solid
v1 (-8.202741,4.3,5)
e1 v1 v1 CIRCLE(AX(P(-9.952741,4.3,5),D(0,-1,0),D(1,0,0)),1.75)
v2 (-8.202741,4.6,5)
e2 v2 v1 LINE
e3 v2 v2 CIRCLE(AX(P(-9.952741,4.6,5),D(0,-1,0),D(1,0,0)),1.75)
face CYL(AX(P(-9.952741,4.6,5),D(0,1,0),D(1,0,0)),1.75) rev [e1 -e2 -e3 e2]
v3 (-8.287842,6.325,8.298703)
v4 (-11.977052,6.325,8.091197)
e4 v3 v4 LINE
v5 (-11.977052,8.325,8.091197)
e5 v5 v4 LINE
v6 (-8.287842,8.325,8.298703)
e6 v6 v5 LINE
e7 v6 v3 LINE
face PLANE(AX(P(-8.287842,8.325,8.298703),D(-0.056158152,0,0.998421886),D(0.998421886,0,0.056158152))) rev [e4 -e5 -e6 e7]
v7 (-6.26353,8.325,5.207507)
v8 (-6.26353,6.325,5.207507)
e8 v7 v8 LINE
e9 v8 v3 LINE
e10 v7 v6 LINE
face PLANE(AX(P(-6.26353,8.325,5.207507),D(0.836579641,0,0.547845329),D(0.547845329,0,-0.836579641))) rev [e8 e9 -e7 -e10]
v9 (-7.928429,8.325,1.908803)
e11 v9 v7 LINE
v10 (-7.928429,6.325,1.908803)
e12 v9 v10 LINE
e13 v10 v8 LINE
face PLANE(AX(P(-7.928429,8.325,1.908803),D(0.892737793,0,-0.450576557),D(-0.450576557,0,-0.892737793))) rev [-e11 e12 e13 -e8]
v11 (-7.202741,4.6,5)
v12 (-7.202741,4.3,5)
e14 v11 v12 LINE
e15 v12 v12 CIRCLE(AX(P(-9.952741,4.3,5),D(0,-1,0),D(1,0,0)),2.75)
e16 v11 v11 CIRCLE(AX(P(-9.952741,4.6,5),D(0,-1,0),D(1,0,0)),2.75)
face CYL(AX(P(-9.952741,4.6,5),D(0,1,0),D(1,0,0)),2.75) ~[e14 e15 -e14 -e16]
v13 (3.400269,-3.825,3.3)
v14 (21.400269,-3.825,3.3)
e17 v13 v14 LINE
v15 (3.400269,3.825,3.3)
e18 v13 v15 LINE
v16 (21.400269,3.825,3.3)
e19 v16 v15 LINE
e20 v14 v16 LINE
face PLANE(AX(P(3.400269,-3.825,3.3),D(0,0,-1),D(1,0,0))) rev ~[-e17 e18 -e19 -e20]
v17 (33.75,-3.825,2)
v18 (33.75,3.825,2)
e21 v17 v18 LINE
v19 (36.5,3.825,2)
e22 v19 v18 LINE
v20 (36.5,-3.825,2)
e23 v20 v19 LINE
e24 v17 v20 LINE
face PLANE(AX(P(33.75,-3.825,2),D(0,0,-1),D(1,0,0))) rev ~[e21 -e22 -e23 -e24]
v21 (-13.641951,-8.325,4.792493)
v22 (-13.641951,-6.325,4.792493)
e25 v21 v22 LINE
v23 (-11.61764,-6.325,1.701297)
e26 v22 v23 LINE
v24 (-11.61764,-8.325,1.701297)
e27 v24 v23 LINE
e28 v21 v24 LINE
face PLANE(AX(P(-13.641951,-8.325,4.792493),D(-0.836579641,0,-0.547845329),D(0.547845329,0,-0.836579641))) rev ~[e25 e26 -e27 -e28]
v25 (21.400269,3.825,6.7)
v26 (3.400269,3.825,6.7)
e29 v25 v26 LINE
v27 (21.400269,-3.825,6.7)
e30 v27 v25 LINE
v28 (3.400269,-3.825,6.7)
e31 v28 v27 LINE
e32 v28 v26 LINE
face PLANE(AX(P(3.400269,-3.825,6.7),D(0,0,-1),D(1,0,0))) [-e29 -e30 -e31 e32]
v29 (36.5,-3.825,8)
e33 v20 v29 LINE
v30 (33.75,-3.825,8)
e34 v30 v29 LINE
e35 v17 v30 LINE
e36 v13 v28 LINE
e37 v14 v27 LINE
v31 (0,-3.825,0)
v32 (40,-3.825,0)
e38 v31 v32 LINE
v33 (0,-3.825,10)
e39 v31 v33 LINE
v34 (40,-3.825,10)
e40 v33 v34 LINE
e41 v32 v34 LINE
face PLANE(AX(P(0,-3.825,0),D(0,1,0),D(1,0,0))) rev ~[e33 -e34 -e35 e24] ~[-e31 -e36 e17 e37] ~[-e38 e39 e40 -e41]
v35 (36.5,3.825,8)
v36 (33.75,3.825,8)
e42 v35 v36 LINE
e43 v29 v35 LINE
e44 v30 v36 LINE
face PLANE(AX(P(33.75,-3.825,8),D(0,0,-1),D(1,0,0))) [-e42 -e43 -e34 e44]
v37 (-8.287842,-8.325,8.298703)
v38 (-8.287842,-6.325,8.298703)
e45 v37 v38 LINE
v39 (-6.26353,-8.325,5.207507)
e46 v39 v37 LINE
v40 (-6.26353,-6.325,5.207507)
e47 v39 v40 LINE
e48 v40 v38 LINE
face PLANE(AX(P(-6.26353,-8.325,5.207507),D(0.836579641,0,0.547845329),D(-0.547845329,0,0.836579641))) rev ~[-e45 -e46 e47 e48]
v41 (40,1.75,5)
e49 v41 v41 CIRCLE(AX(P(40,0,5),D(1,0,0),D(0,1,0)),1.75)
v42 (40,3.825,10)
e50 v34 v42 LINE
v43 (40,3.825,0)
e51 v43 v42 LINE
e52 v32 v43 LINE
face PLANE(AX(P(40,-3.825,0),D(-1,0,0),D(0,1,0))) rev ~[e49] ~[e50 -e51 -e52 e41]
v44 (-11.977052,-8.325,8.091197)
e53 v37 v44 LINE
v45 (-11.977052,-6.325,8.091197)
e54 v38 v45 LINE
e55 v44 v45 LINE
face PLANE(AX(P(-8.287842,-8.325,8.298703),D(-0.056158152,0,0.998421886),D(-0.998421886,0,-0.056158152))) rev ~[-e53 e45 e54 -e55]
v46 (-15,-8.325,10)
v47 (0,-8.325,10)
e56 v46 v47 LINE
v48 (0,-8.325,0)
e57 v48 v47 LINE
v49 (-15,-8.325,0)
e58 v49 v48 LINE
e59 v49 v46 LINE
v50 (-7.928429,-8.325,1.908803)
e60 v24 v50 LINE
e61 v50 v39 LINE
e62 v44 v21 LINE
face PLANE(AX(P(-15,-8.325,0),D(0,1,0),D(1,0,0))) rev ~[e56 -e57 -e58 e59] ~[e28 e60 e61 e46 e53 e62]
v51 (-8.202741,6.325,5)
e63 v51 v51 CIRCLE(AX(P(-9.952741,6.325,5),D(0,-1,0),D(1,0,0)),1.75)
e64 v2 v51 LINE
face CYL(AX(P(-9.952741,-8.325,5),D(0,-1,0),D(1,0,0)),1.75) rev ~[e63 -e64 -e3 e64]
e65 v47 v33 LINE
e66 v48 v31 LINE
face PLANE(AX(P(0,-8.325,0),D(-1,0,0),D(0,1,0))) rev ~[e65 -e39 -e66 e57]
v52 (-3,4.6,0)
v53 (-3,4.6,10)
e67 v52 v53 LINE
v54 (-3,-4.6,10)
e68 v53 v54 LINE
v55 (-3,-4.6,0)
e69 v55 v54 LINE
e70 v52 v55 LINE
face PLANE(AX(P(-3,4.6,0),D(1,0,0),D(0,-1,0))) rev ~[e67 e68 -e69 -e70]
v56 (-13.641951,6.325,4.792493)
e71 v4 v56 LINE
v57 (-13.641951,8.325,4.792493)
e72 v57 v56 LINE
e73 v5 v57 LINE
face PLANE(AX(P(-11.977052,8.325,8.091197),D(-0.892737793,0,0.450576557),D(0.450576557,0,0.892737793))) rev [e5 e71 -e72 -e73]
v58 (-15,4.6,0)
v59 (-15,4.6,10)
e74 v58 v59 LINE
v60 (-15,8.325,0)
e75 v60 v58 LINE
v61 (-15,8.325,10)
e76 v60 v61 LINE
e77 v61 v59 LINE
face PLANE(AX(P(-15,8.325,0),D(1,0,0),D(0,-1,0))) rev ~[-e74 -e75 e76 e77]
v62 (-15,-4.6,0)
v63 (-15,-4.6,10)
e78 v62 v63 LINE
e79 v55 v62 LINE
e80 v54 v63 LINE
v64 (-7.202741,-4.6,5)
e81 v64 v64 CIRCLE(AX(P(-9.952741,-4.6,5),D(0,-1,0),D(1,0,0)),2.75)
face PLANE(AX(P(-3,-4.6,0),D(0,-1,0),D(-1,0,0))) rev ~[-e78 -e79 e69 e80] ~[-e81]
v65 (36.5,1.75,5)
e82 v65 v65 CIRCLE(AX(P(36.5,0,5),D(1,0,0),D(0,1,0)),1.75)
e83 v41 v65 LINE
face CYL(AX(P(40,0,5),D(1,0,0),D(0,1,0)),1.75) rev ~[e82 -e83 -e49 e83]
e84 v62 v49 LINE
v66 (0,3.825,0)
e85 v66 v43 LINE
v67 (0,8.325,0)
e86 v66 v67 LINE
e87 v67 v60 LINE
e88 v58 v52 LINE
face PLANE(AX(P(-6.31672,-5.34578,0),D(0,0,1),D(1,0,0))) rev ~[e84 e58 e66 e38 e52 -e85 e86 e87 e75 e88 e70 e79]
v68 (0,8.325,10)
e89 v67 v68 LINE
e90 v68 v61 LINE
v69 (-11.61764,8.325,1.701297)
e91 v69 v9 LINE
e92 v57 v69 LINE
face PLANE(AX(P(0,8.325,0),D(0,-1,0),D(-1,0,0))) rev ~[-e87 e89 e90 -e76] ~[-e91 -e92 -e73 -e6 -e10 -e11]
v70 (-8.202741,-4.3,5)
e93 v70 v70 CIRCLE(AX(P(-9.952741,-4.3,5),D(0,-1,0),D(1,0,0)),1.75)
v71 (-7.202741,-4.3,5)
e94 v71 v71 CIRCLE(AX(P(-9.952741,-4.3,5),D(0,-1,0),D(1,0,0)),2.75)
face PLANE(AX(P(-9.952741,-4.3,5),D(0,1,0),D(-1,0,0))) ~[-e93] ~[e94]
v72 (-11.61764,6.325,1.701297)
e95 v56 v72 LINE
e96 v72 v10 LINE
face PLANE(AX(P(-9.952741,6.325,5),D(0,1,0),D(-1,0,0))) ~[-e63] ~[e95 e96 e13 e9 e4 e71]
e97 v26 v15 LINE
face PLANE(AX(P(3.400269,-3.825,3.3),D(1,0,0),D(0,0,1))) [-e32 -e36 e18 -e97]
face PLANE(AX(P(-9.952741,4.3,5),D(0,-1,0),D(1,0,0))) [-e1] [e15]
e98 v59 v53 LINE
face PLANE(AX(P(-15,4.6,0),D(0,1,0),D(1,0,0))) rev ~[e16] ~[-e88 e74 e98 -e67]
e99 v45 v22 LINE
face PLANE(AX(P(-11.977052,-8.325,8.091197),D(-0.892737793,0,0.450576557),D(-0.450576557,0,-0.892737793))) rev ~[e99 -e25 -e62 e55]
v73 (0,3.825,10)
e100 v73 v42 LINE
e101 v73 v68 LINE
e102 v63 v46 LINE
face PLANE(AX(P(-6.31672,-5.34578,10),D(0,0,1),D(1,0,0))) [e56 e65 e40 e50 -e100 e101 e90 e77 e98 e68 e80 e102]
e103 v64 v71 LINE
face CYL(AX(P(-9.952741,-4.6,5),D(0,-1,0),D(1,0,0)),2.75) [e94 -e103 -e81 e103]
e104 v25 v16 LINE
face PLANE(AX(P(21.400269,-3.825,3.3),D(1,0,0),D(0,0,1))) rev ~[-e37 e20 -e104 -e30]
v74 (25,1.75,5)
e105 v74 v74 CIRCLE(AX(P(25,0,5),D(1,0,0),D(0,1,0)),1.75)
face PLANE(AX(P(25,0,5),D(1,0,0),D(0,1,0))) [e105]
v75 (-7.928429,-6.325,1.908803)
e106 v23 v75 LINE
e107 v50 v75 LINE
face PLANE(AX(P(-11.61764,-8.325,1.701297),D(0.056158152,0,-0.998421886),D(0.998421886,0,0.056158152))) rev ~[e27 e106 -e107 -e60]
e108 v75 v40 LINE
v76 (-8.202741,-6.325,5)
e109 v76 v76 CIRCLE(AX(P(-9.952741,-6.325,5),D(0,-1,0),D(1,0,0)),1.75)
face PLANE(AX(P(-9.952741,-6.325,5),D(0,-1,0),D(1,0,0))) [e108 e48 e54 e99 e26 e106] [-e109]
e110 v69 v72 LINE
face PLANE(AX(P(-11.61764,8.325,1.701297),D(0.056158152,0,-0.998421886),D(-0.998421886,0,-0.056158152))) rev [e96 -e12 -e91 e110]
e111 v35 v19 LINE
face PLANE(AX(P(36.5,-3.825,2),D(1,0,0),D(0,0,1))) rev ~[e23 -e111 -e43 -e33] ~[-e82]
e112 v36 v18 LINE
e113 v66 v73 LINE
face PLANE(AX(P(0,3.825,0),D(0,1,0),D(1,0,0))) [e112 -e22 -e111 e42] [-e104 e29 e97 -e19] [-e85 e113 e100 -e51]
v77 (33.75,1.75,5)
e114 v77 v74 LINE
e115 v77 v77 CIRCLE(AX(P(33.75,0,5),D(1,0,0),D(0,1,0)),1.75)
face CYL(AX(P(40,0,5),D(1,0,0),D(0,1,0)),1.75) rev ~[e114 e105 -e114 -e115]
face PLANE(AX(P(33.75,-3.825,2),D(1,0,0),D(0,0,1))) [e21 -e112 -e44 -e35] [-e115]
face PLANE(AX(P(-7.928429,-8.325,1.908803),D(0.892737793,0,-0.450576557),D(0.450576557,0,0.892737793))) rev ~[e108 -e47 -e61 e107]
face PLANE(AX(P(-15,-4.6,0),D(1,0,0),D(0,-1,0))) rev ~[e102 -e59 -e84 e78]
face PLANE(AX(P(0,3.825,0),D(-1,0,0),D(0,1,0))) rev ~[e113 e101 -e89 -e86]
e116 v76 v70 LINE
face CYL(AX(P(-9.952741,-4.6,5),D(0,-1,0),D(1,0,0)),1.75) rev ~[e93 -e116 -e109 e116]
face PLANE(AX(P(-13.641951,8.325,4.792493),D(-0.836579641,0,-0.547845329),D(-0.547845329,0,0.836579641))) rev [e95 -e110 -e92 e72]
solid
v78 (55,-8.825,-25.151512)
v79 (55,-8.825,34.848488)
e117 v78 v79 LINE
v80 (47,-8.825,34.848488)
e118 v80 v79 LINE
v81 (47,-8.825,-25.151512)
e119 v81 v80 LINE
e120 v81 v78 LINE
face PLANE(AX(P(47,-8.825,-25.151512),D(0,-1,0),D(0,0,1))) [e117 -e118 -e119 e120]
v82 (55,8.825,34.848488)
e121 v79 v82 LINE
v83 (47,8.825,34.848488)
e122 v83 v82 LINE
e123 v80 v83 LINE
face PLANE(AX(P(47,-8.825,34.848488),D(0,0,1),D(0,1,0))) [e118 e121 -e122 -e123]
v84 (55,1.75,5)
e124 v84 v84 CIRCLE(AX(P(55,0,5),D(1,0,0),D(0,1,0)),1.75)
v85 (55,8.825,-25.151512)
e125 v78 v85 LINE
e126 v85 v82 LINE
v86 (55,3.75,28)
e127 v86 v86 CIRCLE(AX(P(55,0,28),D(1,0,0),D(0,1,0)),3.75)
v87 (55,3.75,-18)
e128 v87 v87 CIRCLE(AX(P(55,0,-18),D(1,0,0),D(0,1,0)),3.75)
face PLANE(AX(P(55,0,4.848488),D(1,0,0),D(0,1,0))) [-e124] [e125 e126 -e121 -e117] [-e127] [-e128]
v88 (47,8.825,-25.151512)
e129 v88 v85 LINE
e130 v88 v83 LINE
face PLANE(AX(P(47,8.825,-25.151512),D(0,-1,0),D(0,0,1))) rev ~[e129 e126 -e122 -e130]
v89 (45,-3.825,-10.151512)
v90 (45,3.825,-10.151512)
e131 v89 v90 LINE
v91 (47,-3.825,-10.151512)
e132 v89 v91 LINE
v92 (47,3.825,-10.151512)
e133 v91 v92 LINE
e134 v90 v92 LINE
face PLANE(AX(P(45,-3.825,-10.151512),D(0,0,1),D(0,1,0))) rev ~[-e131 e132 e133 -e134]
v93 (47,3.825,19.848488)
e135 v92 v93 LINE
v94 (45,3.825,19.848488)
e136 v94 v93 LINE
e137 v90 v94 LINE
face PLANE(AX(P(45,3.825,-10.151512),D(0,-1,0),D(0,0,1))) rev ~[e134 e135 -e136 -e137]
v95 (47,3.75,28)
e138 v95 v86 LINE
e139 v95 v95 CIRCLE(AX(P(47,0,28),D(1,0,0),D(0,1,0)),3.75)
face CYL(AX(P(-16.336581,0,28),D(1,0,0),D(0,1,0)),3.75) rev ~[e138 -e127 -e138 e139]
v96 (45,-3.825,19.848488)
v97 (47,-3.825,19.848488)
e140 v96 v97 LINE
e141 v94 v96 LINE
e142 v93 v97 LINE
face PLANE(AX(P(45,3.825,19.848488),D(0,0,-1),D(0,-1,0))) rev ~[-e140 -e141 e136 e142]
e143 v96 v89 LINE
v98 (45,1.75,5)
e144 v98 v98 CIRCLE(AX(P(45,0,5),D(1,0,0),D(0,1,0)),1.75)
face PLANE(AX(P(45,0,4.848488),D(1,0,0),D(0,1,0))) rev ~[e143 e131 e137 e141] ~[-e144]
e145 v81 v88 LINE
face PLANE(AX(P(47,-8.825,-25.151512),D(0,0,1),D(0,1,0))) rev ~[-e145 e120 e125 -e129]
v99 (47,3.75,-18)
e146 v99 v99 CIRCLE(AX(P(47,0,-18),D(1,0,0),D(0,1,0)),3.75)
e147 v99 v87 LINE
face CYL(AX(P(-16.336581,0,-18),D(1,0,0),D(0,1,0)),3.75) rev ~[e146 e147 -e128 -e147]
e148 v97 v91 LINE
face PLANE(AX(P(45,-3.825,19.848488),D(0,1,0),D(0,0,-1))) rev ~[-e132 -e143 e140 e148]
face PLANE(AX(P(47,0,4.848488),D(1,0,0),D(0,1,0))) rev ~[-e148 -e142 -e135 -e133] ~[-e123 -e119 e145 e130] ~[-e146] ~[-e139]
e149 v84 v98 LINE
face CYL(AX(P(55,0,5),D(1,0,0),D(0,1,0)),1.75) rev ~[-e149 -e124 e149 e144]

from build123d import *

# Parameters (mm, degrees)
F0_W      = 40
F0_H      = 3.825
F1_DEPTH  = 10
F2_R      = 1.75
F3_DEPTH  = 16.651
F4_W      = 18
F4_H      = 3.4
F4_W_2    = 2.75
F4_H_2    = 6
F5_DEPTH  = 12.151
F6_R      = 1.75
F7_DEPTH  = 15
F10_DEPTH = 2
F11_W     = 17.65
F11_H     = 60
F12_DEPTH = 8
F13_R     = 1.75
F14_DEPTH = 70.001
F15_R     = 2.75
F15_R_2   = 1.75
F16_DEPTH = 0.3
F17_R     = 1.75
F18_DEPTH = 2
F20_D     = 7.5


# Not quite as in the source:
# - a pattern or mirror of a feature is missing from the dataset's text; its kind, count and spacing are read off the source's solid


with BuildPart() as f1:
    # F0 (on Top) → F1 (new body)
    with BuildSketch(Plane.XY):
        Polygon((0, -3.825), (0, 0), (-3, 0), (-3, -4.6), (-15, -4.6), (-15, -8.325), (0, -8.325), align=None)
        Polygon((-3, 0), (0, 0), (0, 3.825), (0, 8.325), (-15, 8.325), (-15, 4.6), (-3, 4.6), align=None)
        with Locations((20, 1.9125)):
            Rectangle(F0_W, F0_H)
        with Locations((20, -1.9125)):
            Rectangle(F0_W, F0_H)
    extrude(amount=F1_DEPTH)

    # F2 (on face) → F3 (cut, through all)
    with BuildSketch(Plane.XZ.offset(8.325)):
        with Locations((-9.9527407438, 5)):
            Circle(F2_R)
    extrude(amount=-F3_DEPTH, mode=Mode.SUBTRACT)

    # F4 (on face) → F5 (cut, through all)
    with BuildSketch(Plane.XZ.offset(3.825)):
        with Locations((12.4002694301, 5)):
            Rectangle(F4_W, F4_H)
        with Locations((35.125, 5)):
            Rectangle(F4_W_2, F4_H_2)
    extrude(amount=-F5_DEPTH, mode=Mode.SUBTRACT)

    # F6 (on face) → F7 (cut)
    with BuildSketch(Plane.YZ.offset(40)):
        with Locations((0, 5)):
            Circle(F6_R)
    extrude(amount=-F7_DEPTH, mode=Mode.SUBTRACT)

    # F15 (on face) → F16 (join)
    with BuildSketch(Plane.XZ.offset(-4.6)):
        with Locations((-9.9527407438, 5)):
            Circle(F15_R)
        with Locations((-9.9527407438, 5)):
            Circle(F15_R_2, mode=Mode.SUBTRACT)
    f16 = extrude(amount=F16_DEPTH)

    # F16_copies: F16 across plane
    add(f16.mirror(Plane(origin=(0, 0, 0), x_dir=(0, 0, -1), z_dir=(0, -1, 0))))

    # F17 (on face) → F18 (cut)
    with BuildSketch(Plane.XZ.offset(8.325)):
        Polygon((-7.9284293953, 1.9088033227), (-6.2635302189, 5.2075067143), (-8.2878415673, 8.2987033916), (-11.9770520922, 8.0911966773), (-13.6419512686, 4.7924932857), (-11.6176399202, 1.7012966084), align=None)
        with Locations((-9.9527407438, 5)):
            Circle(F17_R, mode=Mode.SUBTRACT)
    f18 = extrude(amount=-F18_DEPTH, mode=Mode.SUBTRACT)

    # F18_copies: F18 across plane
    add(f18.mirror(Plane.ZX), mode=Mode.SUBTRACT)


with BuildPart() as f10:
    # F9 (on offset) → F10 (new body)
    with BuildSketch(Plane.YZ.offset(45)):
        Polygon((3.825, 0), (3.825, 10), (3.825, 19.8484882712), (-3.825, 19.8484882712), (-3.825, 10), (-3.825, 0), (-3.825, -10.1515117288), (3.825, -10.1515117288), align=None)
    extrude(amount=F10_DEPTH)

    # F11 (on face) → F12 (join)
    with BuildSketch(Plane.YZ.offset(47)):
        with Locations((0, 4.8484882712)):
            Rectangle(F11_W, F11_H)
    extrude(amount=F12_DEPTH)

    # F13 (on face) → F14 (cut, through all)
    with BuildSketch(Plane.YZ.offset(55)):
        with Locations((0, 5)):
            Circle(F13_R)
    extrude(amount=-F14_DEPTH, mode=Mode.SUBTRACT)

    # F20 (through all)
    with Locations(Plane(origin=(47, 0, 0), x_dir=(0, -1, 0), z_dir=(-1, 0, 0))):
        with Locations((0, -18), (0, 28)):
            Hole(F20_D / 2)


solid = Compound([f1.part, f10.part])
